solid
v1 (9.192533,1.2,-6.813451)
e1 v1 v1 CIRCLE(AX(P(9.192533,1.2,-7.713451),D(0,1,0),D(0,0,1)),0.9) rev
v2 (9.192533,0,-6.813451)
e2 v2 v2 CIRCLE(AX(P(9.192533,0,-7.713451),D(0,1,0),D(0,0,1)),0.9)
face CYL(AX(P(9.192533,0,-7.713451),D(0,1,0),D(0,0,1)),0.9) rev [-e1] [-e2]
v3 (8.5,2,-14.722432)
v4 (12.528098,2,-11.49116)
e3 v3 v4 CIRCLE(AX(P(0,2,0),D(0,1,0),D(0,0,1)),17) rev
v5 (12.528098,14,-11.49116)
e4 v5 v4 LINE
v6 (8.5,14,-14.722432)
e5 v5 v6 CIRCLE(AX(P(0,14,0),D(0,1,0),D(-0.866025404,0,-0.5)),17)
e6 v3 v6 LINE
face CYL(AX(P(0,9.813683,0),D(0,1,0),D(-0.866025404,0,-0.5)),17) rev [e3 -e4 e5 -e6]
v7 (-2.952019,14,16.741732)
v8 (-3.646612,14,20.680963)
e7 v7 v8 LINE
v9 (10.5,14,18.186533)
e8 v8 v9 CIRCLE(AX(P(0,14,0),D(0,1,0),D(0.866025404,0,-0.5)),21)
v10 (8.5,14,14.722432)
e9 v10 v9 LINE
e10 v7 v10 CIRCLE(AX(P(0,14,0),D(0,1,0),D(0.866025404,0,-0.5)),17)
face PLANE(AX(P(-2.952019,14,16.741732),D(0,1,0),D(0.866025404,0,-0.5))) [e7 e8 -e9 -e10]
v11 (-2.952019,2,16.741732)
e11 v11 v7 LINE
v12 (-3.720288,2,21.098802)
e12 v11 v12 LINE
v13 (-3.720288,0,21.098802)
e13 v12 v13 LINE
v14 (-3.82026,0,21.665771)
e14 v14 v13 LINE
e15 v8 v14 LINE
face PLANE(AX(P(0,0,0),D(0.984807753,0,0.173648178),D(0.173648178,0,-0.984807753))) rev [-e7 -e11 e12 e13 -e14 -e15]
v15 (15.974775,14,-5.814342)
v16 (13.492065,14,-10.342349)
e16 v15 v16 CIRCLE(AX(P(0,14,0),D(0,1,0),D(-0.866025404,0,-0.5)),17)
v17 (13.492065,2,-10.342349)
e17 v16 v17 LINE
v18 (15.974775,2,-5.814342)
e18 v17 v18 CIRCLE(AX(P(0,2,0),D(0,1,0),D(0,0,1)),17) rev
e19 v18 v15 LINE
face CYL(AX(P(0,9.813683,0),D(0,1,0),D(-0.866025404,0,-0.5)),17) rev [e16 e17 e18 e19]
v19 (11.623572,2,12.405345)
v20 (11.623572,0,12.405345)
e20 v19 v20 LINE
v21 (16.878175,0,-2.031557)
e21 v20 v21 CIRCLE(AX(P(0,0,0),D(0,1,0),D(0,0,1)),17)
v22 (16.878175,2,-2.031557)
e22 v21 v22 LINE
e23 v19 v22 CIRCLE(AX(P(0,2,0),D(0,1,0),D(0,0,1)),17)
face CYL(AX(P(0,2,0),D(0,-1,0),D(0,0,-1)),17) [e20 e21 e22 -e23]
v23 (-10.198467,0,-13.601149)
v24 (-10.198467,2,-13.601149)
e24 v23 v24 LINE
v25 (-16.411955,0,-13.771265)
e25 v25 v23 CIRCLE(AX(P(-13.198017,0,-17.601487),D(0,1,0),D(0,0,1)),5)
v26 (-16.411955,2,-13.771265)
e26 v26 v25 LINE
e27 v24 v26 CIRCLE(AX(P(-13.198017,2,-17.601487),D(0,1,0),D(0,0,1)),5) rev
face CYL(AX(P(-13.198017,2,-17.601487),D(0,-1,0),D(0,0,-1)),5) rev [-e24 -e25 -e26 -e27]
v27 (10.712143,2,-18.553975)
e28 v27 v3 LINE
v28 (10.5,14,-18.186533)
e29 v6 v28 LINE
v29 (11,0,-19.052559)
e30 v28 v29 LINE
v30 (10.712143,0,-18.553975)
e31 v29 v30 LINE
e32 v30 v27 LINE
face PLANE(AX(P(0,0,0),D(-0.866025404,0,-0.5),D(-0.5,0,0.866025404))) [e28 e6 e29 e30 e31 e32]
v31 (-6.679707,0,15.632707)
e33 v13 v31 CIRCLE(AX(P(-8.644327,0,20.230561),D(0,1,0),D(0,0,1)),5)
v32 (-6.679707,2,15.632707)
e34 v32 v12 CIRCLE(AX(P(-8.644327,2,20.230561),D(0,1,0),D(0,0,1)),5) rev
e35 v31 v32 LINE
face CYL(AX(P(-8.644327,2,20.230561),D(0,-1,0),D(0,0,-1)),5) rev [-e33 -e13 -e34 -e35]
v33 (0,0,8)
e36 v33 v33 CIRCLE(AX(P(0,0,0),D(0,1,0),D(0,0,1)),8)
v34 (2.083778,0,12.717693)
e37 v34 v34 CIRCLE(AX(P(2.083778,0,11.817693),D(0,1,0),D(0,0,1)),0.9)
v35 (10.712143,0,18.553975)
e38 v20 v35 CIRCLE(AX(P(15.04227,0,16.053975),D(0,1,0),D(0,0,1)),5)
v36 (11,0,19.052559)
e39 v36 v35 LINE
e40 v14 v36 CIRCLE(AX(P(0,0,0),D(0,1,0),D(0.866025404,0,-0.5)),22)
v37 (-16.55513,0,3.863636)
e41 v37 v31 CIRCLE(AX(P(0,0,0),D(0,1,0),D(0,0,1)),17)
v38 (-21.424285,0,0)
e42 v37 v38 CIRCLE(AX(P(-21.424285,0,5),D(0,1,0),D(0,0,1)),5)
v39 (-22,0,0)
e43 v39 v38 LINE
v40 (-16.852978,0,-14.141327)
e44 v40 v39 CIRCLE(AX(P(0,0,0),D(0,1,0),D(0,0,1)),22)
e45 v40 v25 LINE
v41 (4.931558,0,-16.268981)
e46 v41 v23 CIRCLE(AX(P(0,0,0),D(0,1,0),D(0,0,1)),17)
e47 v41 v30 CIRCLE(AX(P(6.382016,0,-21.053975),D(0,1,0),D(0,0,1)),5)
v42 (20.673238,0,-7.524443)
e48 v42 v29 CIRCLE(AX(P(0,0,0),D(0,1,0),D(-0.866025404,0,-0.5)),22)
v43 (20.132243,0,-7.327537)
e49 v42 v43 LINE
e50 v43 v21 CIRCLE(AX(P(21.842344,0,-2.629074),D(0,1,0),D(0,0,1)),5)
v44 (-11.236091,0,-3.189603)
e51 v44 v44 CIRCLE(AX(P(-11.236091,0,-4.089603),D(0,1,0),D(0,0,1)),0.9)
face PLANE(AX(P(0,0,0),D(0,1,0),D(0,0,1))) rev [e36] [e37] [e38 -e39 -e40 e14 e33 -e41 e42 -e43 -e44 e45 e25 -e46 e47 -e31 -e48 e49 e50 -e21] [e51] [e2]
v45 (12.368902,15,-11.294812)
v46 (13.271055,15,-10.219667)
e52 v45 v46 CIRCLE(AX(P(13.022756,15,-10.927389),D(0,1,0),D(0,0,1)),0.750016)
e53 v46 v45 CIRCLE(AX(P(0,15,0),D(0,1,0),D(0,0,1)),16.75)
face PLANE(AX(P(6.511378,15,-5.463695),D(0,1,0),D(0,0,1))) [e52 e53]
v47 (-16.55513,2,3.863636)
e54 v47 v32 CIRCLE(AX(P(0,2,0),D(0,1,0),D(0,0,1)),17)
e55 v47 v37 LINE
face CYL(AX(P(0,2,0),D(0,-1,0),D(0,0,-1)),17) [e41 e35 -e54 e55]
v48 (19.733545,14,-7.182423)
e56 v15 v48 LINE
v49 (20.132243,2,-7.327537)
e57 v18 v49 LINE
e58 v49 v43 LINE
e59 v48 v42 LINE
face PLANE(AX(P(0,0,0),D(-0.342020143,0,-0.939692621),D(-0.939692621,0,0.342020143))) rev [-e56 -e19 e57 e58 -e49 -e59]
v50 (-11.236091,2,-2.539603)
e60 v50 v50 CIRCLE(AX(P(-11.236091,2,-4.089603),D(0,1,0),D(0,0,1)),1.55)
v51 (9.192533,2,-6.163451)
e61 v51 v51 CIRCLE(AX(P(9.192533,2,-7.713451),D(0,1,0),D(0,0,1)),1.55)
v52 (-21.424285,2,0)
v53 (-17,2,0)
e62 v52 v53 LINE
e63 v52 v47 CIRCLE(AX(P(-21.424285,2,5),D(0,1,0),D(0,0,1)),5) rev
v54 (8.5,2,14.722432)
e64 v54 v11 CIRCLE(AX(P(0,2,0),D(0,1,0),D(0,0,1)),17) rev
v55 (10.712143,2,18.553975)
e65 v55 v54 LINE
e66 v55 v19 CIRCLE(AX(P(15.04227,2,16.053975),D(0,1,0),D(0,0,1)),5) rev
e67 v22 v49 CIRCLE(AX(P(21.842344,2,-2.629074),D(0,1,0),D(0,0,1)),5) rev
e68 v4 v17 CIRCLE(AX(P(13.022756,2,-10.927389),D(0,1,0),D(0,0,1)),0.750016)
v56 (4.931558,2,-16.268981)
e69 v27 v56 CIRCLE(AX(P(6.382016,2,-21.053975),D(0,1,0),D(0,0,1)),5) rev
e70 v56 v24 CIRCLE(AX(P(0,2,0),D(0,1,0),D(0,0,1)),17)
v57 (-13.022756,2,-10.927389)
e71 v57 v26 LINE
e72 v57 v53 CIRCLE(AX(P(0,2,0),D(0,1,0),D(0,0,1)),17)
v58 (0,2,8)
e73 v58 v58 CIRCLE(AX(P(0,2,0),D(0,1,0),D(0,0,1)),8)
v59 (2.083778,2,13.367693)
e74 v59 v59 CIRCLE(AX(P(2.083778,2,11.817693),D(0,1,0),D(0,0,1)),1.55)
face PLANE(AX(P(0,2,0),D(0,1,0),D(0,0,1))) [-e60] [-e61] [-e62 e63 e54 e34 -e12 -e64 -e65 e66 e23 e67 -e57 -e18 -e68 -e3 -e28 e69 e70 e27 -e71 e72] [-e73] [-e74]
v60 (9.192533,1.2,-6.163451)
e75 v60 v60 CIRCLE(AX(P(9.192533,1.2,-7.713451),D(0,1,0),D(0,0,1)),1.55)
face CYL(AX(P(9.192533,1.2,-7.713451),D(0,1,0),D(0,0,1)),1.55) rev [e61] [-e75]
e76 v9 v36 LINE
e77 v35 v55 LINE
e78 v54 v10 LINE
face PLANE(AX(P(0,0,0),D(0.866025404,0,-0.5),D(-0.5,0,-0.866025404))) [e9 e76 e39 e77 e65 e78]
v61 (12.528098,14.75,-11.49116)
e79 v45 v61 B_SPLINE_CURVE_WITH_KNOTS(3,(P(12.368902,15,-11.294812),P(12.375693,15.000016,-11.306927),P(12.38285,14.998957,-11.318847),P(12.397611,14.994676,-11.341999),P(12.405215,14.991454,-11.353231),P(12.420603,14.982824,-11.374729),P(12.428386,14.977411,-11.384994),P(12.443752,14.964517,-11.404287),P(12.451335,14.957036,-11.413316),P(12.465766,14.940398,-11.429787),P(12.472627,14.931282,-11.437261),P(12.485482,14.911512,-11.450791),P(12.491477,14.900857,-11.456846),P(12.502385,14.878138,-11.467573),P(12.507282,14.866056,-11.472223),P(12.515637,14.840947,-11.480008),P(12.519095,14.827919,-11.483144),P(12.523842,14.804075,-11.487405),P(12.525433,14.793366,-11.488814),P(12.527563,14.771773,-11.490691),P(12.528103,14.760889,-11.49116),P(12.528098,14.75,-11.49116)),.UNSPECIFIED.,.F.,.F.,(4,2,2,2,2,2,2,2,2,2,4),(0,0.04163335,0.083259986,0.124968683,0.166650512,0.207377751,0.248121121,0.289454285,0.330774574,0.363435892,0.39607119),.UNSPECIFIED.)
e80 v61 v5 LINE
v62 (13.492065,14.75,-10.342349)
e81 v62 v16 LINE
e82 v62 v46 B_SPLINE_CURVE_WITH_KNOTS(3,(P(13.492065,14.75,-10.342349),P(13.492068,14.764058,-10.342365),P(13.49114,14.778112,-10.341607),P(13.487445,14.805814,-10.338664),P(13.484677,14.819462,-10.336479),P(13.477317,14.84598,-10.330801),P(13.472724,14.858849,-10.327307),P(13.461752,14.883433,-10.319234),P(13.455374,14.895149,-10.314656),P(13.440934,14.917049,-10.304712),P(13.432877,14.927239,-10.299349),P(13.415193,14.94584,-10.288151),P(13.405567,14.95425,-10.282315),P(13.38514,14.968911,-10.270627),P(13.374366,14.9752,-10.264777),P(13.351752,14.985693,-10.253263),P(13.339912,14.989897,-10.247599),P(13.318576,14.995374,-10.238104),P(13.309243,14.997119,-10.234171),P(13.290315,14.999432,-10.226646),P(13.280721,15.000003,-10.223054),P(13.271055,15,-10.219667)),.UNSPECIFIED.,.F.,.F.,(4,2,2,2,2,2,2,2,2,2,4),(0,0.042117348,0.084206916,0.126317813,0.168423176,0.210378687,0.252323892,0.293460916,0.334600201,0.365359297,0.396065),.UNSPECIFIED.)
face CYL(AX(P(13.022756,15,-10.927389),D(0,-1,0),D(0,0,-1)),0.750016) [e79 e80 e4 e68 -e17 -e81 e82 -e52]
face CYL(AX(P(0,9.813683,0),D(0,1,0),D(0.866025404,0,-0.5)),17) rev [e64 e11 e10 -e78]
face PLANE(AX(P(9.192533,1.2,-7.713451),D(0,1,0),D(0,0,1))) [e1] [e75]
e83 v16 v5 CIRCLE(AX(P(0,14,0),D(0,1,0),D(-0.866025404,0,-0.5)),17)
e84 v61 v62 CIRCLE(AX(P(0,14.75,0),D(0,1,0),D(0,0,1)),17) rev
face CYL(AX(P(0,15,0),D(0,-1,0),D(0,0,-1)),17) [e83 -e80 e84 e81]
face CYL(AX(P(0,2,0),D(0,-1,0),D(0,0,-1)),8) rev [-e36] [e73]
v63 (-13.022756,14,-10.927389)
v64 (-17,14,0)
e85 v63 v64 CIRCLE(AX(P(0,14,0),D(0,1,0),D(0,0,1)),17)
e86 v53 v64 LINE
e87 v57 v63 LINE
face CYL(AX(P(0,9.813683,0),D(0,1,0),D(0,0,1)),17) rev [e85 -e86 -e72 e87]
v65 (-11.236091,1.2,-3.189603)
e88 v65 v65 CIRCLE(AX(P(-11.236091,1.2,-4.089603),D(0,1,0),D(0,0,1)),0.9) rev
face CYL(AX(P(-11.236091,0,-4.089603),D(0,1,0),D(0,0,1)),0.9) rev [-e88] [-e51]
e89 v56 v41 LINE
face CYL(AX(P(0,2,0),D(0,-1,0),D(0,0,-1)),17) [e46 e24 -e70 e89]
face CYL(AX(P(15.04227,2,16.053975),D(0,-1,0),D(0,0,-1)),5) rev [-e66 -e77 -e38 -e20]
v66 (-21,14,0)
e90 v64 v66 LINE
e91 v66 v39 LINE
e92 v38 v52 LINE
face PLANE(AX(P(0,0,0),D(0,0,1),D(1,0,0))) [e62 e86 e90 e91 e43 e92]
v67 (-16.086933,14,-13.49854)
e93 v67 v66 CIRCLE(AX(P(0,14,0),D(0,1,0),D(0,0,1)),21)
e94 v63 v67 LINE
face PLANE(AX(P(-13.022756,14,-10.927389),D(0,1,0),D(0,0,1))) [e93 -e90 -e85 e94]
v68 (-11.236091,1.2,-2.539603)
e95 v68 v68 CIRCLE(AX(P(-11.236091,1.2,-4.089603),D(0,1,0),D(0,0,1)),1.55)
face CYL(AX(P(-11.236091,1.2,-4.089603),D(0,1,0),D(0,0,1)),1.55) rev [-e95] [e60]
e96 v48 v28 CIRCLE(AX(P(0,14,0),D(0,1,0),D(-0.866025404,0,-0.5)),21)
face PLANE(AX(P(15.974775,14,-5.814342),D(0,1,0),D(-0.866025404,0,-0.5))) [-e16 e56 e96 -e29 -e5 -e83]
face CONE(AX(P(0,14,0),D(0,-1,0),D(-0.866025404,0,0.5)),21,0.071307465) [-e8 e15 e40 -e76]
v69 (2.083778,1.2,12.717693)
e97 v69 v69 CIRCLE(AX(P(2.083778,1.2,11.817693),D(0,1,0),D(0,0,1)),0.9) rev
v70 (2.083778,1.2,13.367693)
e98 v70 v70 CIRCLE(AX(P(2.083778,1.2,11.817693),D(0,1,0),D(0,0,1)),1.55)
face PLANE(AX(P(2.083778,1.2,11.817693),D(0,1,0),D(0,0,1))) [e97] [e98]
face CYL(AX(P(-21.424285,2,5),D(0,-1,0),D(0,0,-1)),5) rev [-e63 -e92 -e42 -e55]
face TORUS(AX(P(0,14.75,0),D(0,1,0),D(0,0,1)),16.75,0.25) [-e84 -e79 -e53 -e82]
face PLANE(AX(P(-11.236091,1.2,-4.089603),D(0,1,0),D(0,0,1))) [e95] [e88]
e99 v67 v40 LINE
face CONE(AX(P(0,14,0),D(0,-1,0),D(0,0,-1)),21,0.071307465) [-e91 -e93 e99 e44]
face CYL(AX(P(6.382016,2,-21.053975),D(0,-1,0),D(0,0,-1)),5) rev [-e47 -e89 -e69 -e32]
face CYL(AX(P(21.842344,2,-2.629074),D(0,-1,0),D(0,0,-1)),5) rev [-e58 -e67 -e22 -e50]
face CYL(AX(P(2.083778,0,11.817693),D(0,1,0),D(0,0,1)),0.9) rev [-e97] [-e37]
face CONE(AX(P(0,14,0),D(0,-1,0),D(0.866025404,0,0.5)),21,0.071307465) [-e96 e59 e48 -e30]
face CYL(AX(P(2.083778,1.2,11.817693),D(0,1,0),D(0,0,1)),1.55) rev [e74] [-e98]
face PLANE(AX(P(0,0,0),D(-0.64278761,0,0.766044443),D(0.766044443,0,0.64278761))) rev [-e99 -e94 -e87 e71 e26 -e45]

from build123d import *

# Parameters (mm, degrees)
SKETCH1_R           = 17
SKETCH1_R_2         = 8
BOSS_EXTRUDE4_DEPTH = 2
REVOLVE2_ANGLE      = 40
CIRPATTERN1_COUNT   = 3
FILLET1_R           = 5
BOSS_EXTRUDE6_DEPTH = 13
FILLET2_R           = 0.25
SKETCH25_R          = 0.9
CUT_EXTRUDE1_DEPTH  = 34.719430639
SKETCH26_R          = 1.55
CUT_EXTRUDE2_DEPTH  = 0.8


with BuildPart() as part:
    # Sketch1 → Boss-Extrude4 (new body)
    with BuildSketch(Plane(origin=(0, 0, 0), x_dir=(1, 0, 0), z_dir=(0, 1, 0))):
        with Locations(Location((0, 0, 0), (0, 0, 270))):
            Circle(SKETCH1_R)
        with Locations(Location((0, 0, 0), (0, 0, 270))):
            Circle(SKETCH1_R_2, mode=Mode.SUBTRACT)
    extrude(amount=BOSS_EXTRUDE4_DEPTH)

    # Sketch5 → Revolve2 (revolve)
    with BuildSketch(Plane.XY):
        Polygon((-17, 0), (-22, 0), (-21, 14), (-17, 14), align=None)
    revolve2 = revolve(axis=Axis((0, 9.813682869, 0), (0, -1, 0)), revolution_arc=REVOLVE2_ANGLE)

    # CirPattern1: Revolve2 ×3 about axis
    cirpattern1_axis = Axis((0, 0, 0), (0, 1, 0))
    for i in range(1, CIRPATTERN1_COUNT):
        add(revolve2.rotate(cirpattern1_axis, i * 360 / CIRPATTERN1_COUNT))

    # Fillet1
    fillet1_edges = [part.edges().sort_by_distance(p)[0] for p in [
        (-13.022755533, 1, -10.927389365),
        (-17, 1, 0),
        (-2.95201902, 1, 16.741731801),
        (8.5, 1, 14.722431864),
        (15.974774553, 1, -5.814342437),
        (8.5, 1, -14.722431864),
    ]]
    fillet(fillet1_edges, radius=FILLET1_R)

    # Sketch24 → Boss-Extrude6 (add)
    with BuildSketch(Plane(origin=(0, 2, 0), x_dir=(1, 0, 0), z_dir=(0, 1, 0))):
        with BuildLine():
            ThreePointArc((12.528097784, 11.491160338), (12.448209945, 10.445288373), (13.492065142, 10.342348776))
            ThreePointArc((13.492065142, 10.342348776), (13.022755533, 10.927389365), (12.528097784, 11.491160338))
        make_face()
    extrude(amount=BOSS_EXTRUDE6_DEPTH)

    # Fillet2
    # the kernel refuses this fillet: 0.25 mm, written as the material it takes off along each edge
    with BuildSketch(Plane(origin=(0, 15, 0), x_dir=(0.8154762444384231, 0, -0.578790544805809), z_dir=(0.578790544805809, 0, 0.8154762444384231))) as fillet2_piece_1:
        with BuildLine():
            CenterArc((17 - FILLET2_R, -FILLET2_R), FILLET2_R, 0, 90)
            Line((17 - FILLET2_R, 0), (17, 0))
            Line((17, 0), (17, -FILLET2_R))
        make_face()
    revolve(axis=Axis((0, 15, 0), (0, 1, 0)), revolution_arc=9.268958216, mode=Mode.SUBTRACT)

    # Sketch25 → Cut-Extrude1 (cut, through all)
    with BuildSketch(Plane(origin=(0, 2, 0), x_dir=(1, 0, 0), z_dir=(0, 1, 0))):
        with Locations(Location((2.083778132, -11.817693036, 0), (0, 0, 270))):
            Circle(SKETCH25_R)
        with Locations(Location((-11.236091343, 4.089602798, 0), (0, 0, 270))):
            Circle(SKETCH25_R)
        with Locations(Location((9.192533317, 7.713451316, 0), (0, 0, 270))):
            Circle(SKETCH25_R)
    extrude(amount=-CUT_EXTRUDE1_DEPTH, mode=Mode.SUBTRACT)

    # Sketch26 → Cut-Extrude2 (cut)
    with BuildSketch(Plane(origin=(0, 2, 0), x_dir=(1, 0, 0), z_dir=(0, 1, 0))):
        with Locations(Location((2.083778132, -11.817693036, 0), (0, 0, 270))):
            Circle(SKETCH26_R)
        with Locations(Location((-11.236091343, 4.089602798, 0), (0, 0, 270))):
            Circle(SKETCH26_R)
        with Locations(Location((9.192533317, 7.713451316, 0), (0, 0, 270))):
            Circle(SKETCH26_R)
    extrude(amount=-CUT_EXTRUDE2_DEPTH, mode=Mode.SUBTRACT)


solid = part.part
